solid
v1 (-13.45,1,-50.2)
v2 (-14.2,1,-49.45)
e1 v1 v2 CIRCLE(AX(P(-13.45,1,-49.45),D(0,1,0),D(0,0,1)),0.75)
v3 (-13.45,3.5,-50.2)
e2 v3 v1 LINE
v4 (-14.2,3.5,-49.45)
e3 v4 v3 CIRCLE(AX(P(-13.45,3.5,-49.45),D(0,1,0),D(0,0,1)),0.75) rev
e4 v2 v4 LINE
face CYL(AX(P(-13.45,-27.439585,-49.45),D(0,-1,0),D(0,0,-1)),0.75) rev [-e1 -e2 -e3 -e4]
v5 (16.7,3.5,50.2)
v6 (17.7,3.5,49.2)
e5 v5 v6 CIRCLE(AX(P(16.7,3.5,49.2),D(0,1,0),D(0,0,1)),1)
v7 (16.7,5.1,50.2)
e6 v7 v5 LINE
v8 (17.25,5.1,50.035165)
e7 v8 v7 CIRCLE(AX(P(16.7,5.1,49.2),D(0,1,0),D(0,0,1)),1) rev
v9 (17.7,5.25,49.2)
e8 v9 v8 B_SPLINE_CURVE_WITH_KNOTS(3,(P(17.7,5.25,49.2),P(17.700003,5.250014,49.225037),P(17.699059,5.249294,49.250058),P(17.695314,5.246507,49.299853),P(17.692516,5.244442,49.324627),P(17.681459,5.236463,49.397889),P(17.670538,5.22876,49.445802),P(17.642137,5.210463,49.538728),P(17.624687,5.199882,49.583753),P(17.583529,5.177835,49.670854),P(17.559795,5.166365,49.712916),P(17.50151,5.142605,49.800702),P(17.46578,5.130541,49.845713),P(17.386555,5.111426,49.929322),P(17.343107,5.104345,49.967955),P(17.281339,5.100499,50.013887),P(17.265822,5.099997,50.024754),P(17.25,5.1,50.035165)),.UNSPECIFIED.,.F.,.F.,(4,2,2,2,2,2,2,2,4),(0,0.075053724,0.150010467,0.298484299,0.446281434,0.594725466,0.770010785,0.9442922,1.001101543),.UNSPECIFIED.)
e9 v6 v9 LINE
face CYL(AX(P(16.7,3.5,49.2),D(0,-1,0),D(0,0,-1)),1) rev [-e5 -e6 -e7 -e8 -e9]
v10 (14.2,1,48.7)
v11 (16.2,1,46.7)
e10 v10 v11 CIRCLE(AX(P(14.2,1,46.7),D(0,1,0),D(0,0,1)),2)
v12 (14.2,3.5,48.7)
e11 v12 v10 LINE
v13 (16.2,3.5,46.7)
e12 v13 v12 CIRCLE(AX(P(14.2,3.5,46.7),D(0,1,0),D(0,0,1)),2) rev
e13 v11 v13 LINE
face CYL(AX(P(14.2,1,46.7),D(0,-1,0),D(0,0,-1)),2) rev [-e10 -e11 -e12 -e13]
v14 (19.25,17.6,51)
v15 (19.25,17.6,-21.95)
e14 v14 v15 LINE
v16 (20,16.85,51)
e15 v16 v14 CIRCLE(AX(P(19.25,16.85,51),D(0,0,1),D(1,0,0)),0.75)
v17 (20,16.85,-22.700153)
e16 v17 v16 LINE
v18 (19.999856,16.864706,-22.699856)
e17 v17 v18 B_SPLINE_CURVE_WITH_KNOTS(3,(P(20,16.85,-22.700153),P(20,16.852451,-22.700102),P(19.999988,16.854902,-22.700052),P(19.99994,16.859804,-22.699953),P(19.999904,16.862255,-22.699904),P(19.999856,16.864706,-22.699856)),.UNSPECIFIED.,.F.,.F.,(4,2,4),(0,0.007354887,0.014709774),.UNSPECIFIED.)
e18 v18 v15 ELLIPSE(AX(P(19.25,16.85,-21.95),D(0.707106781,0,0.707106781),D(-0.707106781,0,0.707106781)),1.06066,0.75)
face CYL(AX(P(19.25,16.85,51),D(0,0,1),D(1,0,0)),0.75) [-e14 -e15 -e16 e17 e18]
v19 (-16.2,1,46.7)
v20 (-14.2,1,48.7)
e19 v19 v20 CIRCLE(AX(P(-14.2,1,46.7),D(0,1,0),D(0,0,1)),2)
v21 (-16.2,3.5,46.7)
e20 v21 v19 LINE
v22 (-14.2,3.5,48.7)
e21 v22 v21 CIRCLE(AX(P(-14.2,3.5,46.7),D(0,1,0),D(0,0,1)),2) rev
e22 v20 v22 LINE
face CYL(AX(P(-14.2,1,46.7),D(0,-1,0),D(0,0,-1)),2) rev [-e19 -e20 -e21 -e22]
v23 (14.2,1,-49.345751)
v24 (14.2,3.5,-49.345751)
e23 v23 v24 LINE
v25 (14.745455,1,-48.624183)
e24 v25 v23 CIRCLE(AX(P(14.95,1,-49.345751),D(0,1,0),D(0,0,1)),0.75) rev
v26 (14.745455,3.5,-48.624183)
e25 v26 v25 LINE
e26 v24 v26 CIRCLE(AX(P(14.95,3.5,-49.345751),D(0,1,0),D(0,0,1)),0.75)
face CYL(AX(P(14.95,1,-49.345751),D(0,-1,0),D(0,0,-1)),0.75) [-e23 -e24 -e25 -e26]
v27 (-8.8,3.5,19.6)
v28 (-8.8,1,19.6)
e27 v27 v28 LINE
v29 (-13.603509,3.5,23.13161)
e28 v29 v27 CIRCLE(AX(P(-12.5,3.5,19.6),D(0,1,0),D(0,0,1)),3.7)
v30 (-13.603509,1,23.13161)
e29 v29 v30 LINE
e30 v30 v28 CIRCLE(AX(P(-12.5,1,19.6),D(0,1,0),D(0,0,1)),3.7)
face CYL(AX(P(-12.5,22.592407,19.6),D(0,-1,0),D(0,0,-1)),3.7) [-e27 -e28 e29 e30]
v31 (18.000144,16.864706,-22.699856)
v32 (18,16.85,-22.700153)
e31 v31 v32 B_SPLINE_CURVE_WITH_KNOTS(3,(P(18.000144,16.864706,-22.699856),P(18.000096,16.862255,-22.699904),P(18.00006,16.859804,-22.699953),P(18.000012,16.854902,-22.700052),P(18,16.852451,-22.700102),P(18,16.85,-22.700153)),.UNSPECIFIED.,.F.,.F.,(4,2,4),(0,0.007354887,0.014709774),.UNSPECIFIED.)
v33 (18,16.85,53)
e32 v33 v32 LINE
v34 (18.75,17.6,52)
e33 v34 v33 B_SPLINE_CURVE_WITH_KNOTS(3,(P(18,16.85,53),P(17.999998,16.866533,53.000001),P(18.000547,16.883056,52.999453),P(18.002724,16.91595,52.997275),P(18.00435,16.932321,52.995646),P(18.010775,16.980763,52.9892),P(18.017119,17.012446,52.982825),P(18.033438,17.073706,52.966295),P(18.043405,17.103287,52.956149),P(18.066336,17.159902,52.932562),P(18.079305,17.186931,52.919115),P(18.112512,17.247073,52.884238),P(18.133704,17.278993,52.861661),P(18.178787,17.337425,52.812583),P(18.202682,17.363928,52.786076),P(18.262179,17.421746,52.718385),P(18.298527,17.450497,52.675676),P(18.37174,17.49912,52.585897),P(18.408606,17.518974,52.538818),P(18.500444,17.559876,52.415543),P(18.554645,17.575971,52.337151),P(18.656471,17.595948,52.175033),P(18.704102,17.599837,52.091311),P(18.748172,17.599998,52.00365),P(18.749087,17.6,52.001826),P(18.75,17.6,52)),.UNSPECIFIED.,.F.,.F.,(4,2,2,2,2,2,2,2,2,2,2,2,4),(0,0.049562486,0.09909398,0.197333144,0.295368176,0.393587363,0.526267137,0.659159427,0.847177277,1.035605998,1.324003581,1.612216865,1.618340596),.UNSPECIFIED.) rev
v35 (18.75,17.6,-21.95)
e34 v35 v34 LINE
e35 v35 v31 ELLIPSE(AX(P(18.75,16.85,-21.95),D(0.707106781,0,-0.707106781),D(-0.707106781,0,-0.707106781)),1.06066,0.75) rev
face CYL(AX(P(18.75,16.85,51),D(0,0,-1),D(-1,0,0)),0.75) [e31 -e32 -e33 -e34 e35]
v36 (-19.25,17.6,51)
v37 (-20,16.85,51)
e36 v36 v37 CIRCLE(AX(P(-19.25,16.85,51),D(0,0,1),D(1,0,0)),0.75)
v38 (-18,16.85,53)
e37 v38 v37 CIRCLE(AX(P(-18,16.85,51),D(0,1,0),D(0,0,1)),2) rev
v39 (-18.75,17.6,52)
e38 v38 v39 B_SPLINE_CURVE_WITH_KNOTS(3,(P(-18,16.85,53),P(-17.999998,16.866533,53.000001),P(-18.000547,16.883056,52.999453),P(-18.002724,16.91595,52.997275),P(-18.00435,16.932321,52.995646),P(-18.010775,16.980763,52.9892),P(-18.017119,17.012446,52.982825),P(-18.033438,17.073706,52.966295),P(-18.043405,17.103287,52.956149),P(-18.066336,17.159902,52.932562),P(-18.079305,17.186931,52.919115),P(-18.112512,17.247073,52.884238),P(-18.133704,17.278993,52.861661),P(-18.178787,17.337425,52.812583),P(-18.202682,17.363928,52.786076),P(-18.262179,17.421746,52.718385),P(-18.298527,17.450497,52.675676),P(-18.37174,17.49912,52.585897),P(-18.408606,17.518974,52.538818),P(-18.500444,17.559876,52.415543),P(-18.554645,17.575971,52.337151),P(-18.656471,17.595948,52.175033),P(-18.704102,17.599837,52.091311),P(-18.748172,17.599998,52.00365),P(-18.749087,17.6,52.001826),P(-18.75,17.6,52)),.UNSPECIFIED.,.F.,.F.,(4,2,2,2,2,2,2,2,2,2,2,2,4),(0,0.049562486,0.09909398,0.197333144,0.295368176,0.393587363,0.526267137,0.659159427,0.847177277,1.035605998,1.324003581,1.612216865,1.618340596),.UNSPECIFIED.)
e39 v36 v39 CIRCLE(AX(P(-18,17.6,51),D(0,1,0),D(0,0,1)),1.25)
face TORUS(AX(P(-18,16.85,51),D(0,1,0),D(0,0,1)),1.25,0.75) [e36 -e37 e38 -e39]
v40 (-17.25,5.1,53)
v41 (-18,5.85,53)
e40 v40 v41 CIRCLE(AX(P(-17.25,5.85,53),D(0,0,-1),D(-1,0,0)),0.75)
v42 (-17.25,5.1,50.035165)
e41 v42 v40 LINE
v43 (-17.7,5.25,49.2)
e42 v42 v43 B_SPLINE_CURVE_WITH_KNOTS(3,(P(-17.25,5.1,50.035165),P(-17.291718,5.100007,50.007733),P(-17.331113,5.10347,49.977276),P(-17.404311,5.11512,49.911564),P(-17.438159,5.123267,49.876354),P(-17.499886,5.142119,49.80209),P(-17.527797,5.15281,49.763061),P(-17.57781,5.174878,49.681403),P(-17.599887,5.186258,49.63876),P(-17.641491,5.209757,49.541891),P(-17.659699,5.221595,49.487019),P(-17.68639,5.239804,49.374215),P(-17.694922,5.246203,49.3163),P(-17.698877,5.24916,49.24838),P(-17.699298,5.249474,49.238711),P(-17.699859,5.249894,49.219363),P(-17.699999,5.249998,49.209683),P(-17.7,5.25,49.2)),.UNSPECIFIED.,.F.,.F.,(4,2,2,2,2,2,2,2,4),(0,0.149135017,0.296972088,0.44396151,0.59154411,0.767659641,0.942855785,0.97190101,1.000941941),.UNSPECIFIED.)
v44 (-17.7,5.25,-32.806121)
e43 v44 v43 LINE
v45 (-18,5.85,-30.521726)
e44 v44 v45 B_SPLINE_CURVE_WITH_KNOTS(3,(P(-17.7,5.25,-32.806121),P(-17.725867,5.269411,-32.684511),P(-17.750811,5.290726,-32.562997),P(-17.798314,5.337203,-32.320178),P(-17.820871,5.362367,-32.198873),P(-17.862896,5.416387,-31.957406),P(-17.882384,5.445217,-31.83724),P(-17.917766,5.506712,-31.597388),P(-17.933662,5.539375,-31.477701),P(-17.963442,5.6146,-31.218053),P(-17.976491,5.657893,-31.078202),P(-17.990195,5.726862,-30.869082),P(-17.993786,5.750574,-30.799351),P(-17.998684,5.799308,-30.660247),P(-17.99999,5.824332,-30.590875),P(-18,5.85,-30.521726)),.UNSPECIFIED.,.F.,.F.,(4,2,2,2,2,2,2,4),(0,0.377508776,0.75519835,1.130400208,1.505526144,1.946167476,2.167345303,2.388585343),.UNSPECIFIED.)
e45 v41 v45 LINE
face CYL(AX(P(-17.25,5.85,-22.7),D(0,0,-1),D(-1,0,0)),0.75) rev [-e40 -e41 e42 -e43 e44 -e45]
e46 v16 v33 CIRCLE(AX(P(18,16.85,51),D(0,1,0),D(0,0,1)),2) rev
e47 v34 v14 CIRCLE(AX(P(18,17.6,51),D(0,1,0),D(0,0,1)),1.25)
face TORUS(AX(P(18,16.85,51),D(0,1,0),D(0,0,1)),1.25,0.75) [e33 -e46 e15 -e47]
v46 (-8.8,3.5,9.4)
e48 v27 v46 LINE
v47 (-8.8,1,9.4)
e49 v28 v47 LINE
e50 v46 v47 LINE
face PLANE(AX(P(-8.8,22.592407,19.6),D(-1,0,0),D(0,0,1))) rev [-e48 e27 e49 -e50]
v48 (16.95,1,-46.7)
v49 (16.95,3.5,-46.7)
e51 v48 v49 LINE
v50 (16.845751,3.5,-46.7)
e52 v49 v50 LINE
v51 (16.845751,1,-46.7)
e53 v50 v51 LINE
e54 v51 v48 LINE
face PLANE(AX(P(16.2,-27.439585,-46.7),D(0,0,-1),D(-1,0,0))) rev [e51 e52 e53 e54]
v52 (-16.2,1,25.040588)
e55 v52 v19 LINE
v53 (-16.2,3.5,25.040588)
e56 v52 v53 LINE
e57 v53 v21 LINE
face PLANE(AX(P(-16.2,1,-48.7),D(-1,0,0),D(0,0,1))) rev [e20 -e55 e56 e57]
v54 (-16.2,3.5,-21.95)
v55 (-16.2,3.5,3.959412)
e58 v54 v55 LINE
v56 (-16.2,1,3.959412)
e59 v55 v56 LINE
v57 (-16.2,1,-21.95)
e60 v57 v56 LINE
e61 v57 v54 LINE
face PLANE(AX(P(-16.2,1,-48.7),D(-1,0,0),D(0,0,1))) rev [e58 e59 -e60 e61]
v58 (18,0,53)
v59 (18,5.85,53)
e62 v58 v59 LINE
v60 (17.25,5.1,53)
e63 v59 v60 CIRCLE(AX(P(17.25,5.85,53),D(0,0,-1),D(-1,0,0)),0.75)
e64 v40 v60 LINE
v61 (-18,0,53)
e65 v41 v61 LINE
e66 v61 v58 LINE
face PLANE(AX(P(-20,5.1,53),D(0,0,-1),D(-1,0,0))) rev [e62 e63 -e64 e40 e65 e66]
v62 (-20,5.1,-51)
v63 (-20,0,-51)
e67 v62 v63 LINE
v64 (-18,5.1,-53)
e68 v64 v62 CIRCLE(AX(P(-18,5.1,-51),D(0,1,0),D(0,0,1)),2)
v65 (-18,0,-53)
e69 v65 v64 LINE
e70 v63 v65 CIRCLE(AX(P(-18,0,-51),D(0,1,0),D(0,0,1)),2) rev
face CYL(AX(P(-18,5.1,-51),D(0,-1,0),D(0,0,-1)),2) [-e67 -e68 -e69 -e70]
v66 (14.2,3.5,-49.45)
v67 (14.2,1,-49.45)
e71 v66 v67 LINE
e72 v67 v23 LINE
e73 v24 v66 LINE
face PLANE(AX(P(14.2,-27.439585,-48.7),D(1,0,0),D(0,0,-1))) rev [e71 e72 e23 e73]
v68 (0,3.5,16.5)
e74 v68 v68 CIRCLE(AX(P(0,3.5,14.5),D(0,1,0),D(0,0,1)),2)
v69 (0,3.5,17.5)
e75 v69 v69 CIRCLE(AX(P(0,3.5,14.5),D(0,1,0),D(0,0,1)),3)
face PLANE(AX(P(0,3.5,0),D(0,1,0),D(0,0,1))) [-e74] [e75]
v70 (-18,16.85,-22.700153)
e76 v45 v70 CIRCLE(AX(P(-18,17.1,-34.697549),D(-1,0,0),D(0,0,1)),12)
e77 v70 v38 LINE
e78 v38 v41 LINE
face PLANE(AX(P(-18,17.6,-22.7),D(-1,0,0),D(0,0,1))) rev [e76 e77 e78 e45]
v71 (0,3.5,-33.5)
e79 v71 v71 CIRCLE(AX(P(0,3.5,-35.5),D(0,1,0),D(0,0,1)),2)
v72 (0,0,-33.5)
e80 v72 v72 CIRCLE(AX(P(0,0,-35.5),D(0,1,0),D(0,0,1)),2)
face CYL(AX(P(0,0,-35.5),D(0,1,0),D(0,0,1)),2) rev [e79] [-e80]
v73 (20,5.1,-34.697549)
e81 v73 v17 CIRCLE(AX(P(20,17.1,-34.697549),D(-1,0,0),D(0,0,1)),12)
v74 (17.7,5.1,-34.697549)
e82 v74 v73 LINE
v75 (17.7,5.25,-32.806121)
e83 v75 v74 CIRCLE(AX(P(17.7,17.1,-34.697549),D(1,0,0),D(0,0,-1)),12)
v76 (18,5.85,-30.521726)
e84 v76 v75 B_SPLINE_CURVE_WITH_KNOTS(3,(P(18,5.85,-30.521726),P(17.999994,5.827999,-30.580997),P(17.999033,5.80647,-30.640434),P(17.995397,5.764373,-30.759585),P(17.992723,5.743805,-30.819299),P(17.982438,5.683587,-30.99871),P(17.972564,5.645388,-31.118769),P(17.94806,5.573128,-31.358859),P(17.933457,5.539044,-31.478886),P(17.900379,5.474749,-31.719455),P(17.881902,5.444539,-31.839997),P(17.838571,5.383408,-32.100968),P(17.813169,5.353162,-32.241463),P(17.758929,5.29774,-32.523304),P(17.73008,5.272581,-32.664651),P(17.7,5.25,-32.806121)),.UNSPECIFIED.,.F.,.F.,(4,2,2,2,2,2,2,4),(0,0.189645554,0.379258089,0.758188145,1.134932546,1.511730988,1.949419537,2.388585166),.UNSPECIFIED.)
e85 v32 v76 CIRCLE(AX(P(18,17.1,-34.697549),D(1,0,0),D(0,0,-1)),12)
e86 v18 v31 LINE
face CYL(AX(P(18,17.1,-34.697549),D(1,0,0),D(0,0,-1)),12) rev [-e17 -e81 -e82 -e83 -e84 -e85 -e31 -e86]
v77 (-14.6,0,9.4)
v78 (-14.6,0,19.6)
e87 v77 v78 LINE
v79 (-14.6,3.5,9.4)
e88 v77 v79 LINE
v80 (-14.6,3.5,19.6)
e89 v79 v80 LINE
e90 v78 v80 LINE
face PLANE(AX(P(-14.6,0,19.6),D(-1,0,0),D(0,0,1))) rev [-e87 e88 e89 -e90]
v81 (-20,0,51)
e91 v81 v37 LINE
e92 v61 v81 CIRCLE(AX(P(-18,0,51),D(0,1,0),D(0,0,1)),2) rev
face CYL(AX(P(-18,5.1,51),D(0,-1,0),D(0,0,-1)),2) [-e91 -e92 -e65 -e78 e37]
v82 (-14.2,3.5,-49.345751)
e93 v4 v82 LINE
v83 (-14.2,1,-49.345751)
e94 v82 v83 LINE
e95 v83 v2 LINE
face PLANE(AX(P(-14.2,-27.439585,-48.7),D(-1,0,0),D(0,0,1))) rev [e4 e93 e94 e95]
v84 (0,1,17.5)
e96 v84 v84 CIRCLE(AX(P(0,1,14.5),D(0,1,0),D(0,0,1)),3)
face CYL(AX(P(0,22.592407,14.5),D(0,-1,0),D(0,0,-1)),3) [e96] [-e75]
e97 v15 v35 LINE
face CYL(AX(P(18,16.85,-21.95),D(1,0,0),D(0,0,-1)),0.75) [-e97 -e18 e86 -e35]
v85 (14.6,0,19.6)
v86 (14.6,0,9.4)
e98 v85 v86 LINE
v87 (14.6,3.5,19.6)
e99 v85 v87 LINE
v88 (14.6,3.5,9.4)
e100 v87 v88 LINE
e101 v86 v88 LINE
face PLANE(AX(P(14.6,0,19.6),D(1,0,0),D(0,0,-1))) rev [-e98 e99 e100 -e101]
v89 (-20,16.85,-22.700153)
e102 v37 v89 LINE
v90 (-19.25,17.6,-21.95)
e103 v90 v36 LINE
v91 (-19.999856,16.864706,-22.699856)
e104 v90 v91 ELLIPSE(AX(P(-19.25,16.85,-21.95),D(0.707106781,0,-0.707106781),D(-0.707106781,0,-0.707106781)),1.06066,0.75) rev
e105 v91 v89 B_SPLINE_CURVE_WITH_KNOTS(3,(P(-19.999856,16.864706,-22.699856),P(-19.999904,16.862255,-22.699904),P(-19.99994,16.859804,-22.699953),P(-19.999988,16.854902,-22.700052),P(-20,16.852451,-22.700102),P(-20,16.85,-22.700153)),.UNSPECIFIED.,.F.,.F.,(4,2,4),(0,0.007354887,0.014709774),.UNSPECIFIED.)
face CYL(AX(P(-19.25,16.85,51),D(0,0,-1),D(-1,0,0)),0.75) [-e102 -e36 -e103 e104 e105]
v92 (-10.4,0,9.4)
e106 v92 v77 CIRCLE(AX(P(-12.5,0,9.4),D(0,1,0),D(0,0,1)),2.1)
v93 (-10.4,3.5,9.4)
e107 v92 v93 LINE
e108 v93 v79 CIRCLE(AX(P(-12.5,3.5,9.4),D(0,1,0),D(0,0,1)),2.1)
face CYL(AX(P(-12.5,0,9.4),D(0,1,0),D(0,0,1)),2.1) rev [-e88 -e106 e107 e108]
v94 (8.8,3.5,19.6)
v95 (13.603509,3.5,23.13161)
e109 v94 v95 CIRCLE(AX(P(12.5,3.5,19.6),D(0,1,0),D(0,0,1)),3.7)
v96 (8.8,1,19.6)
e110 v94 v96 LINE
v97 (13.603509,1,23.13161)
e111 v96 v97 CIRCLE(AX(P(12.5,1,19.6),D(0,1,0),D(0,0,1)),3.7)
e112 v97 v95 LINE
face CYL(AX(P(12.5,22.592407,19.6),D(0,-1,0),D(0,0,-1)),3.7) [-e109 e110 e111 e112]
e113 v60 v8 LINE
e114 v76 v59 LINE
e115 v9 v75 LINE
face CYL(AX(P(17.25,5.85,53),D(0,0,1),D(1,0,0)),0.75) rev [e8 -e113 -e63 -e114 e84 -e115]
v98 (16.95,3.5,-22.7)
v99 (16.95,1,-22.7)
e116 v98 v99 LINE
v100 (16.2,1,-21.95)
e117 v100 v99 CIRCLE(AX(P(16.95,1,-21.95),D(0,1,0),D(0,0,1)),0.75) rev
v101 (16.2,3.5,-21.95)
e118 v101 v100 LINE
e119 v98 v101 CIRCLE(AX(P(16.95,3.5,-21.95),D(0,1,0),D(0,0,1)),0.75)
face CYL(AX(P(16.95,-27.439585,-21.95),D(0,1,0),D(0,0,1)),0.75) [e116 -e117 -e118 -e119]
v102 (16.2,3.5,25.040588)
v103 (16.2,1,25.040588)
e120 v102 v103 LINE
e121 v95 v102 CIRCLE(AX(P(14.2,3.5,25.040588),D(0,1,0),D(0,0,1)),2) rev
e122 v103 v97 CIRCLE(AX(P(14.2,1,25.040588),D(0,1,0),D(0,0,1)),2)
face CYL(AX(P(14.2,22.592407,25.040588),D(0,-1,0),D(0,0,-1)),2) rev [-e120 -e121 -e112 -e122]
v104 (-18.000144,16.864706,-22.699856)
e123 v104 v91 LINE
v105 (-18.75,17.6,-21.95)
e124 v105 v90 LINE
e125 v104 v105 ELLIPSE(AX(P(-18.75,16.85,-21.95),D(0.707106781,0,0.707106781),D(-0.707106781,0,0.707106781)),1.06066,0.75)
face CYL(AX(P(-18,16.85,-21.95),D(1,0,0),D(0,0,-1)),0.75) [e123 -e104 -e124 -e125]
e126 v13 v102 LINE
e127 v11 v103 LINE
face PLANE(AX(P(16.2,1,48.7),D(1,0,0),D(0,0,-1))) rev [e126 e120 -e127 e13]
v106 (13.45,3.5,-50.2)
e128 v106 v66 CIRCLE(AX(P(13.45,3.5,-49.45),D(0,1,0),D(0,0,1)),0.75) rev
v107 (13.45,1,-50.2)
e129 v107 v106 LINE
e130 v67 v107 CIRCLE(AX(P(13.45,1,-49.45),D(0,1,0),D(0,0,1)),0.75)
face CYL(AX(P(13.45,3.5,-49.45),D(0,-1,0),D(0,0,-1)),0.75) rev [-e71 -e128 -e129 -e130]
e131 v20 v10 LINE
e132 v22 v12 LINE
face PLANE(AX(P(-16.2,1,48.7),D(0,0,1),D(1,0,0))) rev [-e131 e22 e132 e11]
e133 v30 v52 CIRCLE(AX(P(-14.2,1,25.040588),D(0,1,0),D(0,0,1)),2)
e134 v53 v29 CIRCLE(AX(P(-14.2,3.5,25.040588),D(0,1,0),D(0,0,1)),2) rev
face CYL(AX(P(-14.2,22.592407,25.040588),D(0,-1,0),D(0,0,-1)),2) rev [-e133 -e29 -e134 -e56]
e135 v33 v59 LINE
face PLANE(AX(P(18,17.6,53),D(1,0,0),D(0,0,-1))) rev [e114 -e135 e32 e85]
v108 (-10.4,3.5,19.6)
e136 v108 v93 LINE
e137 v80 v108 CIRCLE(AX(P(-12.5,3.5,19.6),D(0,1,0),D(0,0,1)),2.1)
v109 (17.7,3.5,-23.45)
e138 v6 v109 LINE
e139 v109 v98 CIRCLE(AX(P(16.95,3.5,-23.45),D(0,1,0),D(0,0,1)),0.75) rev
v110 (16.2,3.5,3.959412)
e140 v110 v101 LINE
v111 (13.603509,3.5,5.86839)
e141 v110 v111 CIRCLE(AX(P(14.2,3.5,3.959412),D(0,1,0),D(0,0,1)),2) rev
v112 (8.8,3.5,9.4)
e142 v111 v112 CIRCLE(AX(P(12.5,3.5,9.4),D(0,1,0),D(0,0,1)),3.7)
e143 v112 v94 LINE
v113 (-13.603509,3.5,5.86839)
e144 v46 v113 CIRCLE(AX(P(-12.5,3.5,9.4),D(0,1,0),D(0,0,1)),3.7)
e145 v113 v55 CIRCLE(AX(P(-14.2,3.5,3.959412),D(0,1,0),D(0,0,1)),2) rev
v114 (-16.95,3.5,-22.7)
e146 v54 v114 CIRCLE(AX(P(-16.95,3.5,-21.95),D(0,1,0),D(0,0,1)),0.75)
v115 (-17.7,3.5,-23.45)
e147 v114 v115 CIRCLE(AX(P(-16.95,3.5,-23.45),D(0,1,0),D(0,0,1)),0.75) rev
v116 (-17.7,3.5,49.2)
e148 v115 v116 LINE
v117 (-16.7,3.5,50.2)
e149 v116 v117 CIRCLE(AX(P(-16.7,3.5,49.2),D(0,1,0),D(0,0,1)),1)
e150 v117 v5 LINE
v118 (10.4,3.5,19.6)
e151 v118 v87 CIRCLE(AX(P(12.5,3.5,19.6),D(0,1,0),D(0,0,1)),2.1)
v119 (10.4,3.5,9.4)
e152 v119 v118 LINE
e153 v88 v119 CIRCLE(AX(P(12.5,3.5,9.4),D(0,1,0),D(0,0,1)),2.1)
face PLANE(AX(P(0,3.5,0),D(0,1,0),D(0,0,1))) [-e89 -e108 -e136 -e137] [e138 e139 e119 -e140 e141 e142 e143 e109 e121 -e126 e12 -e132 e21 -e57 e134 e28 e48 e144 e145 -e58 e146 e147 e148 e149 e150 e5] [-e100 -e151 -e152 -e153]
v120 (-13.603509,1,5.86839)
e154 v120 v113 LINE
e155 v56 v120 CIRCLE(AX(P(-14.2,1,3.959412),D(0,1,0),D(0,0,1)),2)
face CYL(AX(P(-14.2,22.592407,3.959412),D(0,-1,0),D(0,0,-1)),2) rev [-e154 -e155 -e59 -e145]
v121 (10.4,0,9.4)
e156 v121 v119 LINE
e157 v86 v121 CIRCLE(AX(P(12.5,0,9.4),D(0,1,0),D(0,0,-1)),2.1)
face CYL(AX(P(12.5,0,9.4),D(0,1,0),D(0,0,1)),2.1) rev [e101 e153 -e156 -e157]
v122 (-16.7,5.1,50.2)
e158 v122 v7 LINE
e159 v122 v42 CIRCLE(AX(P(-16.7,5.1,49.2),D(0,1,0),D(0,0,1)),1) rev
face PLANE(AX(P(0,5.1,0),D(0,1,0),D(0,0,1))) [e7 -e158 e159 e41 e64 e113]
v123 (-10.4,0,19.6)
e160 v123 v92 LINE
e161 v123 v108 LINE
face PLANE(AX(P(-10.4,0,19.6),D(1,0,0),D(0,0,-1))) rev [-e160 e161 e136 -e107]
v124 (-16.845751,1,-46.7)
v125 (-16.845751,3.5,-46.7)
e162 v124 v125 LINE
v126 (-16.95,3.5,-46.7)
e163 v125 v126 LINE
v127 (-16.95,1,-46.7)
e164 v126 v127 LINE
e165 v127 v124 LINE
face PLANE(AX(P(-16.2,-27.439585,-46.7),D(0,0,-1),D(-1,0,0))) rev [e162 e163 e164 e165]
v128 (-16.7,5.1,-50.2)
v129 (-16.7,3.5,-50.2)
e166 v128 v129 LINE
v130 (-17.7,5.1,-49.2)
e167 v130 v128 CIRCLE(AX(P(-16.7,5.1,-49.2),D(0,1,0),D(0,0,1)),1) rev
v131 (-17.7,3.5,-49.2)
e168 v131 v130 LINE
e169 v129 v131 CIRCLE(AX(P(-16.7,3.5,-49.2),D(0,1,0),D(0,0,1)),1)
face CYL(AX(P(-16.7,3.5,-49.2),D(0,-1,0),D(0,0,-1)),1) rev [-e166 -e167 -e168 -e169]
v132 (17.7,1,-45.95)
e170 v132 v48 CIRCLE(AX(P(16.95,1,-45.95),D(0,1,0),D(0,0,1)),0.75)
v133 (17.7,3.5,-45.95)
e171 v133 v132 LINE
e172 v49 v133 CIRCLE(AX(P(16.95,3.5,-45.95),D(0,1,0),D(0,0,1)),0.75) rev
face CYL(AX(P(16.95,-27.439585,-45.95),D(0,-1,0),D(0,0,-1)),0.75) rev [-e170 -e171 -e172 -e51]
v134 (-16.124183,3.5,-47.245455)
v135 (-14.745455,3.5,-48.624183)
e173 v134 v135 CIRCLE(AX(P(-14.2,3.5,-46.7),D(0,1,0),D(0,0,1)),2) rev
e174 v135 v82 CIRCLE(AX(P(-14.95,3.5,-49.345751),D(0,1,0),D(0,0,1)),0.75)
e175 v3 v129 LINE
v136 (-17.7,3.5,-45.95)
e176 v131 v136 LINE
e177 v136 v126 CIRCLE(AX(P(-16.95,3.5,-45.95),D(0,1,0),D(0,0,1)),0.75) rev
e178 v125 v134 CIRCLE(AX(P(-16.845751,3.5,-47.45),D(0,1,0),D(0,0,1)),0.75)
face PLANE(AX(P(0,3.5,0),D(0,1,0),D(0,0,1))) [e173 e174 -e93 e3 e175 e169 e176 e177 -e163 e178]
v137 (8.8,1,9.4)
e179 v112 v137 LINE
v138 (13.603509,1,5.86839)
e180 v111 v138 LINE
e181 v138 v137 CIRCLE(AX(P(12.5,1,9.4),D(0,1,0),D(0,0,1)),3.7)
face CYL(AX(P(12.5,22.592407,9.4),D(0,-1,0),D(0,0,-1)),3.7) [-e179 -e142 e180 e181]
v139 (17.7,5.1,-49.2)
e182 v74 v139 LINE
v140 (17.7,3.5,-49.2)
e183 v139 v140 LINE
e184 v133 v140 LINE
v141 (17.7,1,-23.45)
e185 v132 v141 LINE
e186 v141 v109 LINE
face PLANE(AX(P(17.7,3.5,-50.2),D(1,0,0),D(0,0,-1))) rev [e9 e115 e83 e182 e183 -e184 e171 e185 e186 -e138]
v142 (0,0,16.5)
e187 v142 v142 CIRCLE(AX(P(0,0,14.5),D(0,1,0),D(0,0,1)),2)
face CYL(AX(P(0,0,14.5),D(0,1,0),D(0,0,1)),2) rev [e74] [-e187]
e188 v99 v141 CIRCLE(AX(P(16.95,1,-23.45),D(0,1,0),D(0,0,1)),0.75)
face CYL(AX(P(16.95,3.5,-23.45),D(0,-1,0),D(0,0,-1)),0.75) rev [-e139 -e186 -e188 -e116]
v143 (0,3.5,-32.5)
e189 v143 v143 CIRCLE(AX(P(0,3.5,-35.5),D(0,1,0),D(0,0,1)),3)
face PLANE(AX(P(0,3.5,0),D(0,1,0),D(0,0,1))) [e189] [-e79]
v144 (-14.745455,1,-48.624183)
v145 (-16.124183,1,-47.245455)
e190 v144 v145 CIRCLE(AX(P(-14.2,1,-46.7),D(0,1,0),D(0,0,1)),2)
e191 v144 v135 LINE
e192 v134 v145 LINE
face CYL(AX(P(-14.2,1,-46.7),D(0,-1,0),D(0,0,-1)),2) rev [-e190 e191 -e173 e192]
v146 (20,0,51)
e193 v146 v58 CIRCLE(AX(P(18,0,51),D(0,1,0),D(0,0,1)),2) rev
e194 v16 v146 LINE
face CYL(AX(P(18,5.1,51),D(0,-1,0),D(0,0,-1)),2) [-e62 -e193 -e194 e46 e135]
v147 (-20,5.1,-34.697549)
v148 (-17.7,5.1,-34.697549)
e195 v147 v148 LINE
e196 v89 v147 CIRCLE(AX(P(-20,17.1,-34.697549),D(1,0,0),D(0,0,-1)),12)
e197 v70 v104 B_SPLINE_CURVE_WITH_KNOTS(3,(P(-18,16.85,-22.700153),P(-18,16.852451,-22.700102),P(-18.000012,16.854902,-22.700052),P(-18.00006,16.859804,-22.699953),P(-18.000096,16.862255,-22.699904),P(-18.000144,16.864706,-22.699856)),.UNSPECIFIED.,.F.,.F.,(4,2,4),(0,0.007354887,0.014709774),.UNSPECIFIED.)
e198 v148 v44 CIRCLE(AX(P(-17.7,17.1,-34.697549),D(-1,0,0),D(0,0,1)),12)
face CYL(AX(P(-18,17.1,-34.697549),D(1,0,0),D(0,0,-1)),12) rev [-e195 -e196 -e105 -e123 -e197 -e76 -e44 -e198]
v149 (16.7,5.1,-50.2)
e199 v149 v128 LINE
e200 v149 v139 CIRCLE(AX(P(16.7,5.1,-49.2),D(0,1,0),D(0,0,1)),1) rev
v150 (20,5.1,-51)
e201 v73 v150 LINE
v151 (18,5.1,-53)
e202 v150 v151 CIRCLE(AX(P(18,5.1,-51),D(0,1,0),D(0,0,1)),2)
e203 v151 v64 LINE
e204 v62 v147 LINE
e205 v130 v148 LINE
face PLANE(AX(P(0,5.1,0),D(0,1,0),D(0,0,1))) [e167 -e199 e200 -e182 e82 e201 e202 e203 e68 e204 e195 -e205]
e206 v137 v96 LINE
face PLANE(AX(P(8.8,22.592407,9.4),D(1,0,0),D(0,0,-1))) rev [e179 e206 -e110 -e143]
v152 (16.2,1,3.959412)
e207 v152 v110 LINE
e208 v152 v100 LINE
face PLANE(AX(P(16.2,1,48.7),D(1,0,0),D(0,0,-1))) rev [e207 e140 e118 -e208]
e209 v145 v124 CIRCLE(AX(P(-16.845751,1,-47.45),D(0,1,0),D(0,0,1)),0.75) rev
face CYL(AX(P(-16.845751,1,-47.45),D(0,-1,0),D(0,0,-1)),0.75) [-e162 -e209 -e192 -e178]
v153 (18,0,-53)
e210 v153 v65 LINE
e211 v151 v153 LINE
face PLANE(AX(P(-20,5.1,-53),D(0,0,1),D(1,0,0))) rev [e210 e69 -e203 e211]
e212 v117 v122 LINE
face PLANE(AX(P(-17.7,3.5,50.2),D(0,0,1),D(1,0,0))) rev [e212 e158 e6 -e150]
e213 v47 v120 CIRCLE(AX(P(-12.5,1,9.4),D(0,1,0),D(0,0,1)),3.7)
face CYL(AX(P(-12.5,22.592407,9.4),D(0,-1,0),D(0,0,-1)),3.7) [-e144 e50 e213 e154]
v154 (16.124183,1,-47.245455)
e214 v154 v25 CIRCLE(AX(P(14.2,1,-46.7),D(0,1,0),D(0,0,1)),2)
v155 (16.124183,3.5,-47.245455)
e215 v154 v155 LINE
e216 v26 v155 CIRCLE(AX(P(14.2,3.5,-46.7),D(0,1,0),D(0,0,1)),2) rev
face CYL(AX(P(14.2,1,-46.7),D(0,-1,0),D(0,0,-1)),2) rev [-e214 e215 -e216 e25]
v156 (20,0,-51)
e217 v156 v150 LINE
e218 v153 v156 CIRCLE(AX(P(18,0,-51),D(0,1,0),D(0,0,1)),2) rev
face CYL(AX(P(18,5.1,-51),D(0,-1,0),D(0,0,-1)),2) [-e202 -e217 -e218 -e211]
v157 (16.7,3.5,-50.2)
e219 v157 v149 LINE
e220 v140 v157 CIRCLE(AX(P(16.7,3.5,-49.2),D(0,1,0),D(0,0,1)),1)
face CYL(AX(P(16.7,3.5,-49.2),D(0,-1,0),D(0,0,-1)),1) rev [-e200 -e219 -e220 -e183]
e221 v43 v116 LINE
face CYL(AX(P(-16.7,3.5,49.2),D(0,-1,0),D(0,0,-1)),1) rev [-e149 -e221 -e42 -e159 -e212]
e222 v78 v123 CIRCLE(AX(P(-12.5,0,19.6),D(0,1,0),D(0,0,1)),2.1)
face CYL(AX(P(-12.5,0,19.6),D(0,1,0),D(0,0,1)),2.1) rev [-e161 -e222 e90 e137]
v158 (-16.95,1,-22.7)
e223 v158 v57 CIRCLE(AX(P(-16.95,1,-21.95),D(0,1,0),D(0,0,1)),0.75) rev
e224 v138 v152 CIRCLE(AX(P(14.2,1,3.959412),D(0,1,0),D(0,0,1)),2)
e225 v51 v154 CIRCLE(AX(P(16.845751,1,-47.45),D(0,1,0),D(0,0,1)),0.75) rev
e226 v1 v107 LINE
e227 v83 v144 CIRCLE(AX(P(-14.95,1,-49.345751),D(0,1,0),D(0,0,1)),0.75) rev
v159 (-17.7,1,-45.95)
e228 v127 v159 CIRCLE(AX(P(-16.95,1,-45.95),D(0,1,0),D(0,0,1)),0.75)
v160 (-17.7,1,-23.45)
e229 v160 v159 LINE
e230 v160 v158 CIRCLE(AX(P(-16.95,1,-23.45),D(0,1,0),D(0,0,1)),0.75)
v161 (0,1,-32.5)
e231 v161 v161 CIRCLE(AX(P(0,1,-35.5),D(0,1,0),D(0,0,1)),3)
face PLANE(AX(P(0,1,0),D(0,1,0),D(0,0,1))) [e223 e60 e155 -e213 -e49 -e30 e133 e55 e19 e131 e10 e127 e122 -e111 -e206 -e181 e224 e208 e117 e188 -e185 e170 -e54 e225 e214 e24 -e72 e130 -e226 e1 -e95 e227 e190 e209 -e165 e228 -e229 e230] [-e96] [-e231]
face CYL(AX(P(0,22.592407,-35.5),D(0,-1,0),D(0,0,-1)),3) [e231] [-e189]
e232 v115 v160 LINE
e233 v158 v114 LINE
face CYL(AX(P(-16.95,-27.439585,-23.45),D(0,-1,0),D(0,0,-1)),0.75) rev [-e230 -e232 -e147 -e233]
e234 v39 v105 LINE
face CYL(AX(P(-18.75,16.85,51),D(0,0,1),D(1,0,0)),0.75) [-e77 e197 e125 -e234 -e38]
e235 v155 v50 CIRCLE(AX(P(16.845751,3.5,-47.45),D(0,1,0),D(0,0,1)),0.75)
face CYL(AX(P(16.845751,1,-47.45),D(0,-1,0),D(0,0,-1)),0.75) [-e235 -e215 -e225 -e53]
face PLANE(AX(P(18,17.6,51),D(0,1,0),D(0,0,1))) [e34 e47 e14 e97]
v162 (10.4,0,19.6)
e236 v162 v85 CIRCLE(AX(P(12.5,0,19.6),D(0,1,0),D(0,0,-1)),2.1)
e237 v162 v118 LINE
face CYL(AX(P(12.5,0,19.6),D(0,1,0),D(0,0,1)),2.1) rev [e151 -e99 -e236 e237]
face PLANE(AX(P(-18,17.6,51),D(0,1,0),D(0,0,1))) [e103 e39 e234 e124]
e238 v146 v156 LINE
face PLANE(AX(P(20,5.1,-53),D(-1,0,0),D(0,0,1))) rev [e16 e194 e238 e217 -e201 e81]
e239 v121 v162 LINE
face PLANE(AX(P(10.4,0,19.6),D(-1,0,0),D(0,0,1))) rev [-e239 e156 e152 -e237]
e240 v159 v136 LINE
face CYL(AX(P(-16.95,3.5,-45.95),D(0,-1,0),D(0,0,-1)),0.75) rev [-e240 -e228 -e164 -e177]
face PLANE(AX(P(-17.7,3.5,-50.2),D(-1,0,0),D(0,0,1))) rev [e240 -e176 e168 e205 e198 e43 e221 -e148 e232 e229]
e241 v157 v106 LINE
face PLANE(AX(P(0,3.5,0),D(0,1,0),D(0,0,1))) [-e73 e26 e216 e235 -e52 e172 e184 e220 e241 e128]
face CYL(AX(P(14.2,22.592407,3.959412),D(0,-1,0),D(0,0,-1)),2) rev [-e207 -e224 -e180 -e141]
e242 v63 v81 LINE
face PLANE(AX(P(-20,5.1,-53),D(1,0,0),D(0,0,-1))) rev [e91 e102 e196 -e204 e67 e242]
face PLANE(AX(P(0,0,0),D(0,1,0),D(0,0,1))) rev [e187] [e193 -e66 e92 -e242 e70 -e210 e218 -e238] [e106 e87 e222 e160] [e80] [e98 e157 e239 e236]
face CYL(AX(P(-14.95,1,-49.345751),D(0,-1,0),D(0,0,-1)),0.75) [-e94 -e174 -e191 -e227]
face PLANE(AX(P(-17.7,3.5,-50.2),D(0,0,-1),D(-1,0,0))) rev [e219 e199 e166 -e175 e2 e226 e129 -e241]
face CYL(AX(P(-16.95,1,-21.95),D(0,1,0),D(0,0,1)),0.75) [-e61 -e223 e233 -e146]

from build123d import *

# Parameters (mm, degrees)
EXTRUDE_1_DEPTH     = 5.1
CUT_EXTRUDE_1_DEPTH = 1.6
CUT_EXTRUDE_2_DEPTH = 2.5
FILLET_1_R          = 2
SKETCH_4_W          = 28.4
SKETCH_4_H          = 1.5
CUT_EXTRUDE_3_DEPTH = 2.5
SKETCH_6_R          = 2.0000000000000013
SKETCH_6_R_2        = 2.0000000000000004
CUT_EXTRUDE_4_DEPTH = 57.796214662598786
EXTRUDE_START       = 2.5
SKETCH_7_R          = 3.000000000000001
SKETCH_7_R_2        = 2.000000000000002
SKETCH_7_R_3        = 3.0000000000000004
SKETCH_7_R_4        = 2
EXTRUDE_2_DEPTH     = 2.5
FILLET_2_R          = 2
FILLET_3_R          = 0.75
EXTRUDE_START_2     = 12.5
EXTRUDE_3_DEPTH     = 12.5
FILLET_4_R          = 0.75
FILLET_START        = -20
FILLET_5_DEPTH      = 2
FILLET_START_2      = 18
FILLET_5_2_DEPTH    = 2
FILLET_START_3      = -34.697548884
FILLET_5_3_DEPTH    = 11.997548884
FILLET_START_4      = -18
FILLET_5_4_DEPTH    = 36
FILLET_6_R          = 1


with BuildPart() as part:
    # 草图1 → 凸台-拉伸1 (new body)
    with BuildSketch(Plane(origin=(0, 0, 0), x_dir=(1, 0, 0), z_dir=(0, 1, 0))):
        Polygon((-20.000000000000004, 53.00000000000001), (19.999999999999996, 53.00000000000001), (20.00000000000001, -52.99999999999999), (-19.99999999999999, -52.99999999999999), align=None)
    extrude(amount=EXTRUDE_1_DEPTH)

    # 草图2 → 切除-拉伸1 (cut)
    with BuildSketch(Plane(origin=(0, 5.1, 0), x_dir=(1, 0, 0), z_dir=(0, 1, 0))):
        Polygon((-17.700000000000006, 50.20000000000001), (17.699999999999992, 50.20000000000001), (17.700000000000006, -50.199999999999996), (-17.699999999999992, -50.199999999999996), align=None)
    extrude(amount=-CUT_EXTRUDE_1_DEPTH, mode=Mode.SUBTRACT)

    # 草图3 → 切除-拉伸2 (cut)
    with BuildSketch(Plane(origin=(0, 3.4999999999999996, 0), x_dir=(1, 0, 0), z_dir=(0, 1, 0))):
        Polygon((16.200000000000006, -48.699999999999996), (16.199999999999992, 48.70000000000001), (-16.200000000000006, 48.70000000000001), (-16.199999999999992, -48.699999999999996), align=None)
    extrude(amount=-CUT_EXTRUDE_2_DEPTH, mode=Mode.SUBTRACT)

    # 圆角1
    fillet_1_edges = [part.edges().sort_by_distance(p)[0] for p in [
        (16.200000000000006, 2.2499999999999996, 48.699999999999996),
        (-16.199999999999992, 2.2499999999999996, 48.699999999999996),
        (-16.200000000000006, 2.2499999999999996, -48.70000000000001),
        (16.199999999999992, 2.2499999999999996, -48.70000000000001),
        (20.00000000000001, 2.55, 52.99999999999999),
        (-19.99999999999999, 2.55, 52.99999999999999),
        (-20.000000000000004, 2.55, -53.00000000000001),
        (19.999999999999996, 2.55, -53.00000000000001),
    ]]
    fillet(fillet_1_edges, radius=FILLET_1_R)

    # 草图4 → 切除-拉伸3 (cut)
    with BuildSketch(Plane(origin=(0, 3.4999999999999996, 0), x_dir=(1, 0, 0), z_dir=(0, 1, 0))):
        with Locations((-4.44e-15, 49.45000000000002)):
            Rectangle(SKETCH_4_W, SKETCH_4_H)
        Polygon((-16.200000000000006, 46.7), (-17.700000000000006, 46.7), (-17.70000000000001, 22.700000000000006), (-16.200000000000003, 22.700000000000006), align=None)
        Polygon((16.199999999999992, 46.7), (17.700000000000006, 46.7), (17.700000000000006, 22.7), (16.2, 22.700000000000006), align=None)
    extrude(amount=-CUT_EXTRUDE_3_DEPTH, mode=Mode.SUBTRACT)

    # 草图6 → 切除-拉伸4 (cut, through all)
    with BuildSketch(Plane(origin=(0, 0.9999999999999996, 0), x_dir=(1, 0, 0), z_dir=(0, 1, 0))):
        with Locations(Location((2.14e-15, 35.5, 0), (0, 0, 270))):
            Circle(SKETCH_6_R)
        with Locations(Location((8.51e-15, -14.5, 0), (0, 0, 270))):
            Circle(SKETCH_6_R_2)
        with BuildLine():
            Line((-14.59999999999999, -19.599999999999998), (-14.59999999999999, -9.400000000000002))
            ThreePointArc((-14.59999999999999, -9.400000000000002), (-12.499999999999993, -7.300000000000006), (-10.399999999999997, -9.4))
            Line((-10.399999999999997, -9.4), (-10.399999999999995, -19.6))
            ThreePointArc((-10.399999999999995, -19.6), (-12.499999999999995, -21.699999999999996), (-14.59999999999999, -19.599999999999998))
        make_face()
        with BuildLine():
            Line((14.600000000000007, -19.599999999999998), (14.600000000000005, -9.399999999999999))
            ThreePointArc((14.600000000000005, -9.399999999999999), (12.500000000000009, -7.3000000000000025), (10.40000000000001, -9.4))
            Line((10.40000000000001, -9.4), (10.400000000000011, -19.599999999999998))
            ThreePointArc((10.400000000000011, -19.599999999999998), (12.500000000000009, -21.699999999999996), (14.600000000000007, -19.599999999999998))
        make_face()
    extrude(amount=-CUT_EXTRUDE_4_DEPTH, mode=Mode.SUBTRACT)

    # 草图7 → 凸台-拉伸2 (add)
    # profile 1 of 4: a face of its own
    with BuildSketch(Plane(origin=(0, 0.9999999999999996, 0), x_dir=(1, 0, 0), z_dir=(0, 1, 0)).offset(EXTRUDE_START)):
        with Locations(Location((2.14e-15, 35.5, 0), (0, 0, 270))):
            Circle(SKETCH_7_R)
        with Locations(Location((2.14e-15, 35.5, 0), (0, 0, 270))):
            Circle(SKETCH_7_R_2, mode=Mode.SUBTRACT)
    # profile 2 of 4: a face of its own
    with BuildSketch(Plane(origin=(0, 0.9999999999999996, 0), x_dir=(1, 0, 0), z_dir=(0, 1, 0)).offset(EXTRUDE_START)):
        with Locations(Location((8.51e-15, -14.5, 0), (0, 0, 270))):
            Circle(SKETCH_7_R_3)
        with Locations(Location((8.51e-15, -14.5, 0), (0, 0, 270))):
            Circle(SKETCH_7_R_4, mode=Mode.SUBTRACT)
    # profile 3 of 4: a face of its own
    with BuildSketch(Plane(origin=(0, 0.9999999999999996, 0), x_dir=(1, 0, 0), z_dir=(0, 1, 0)).offset(EXTRUDE_START)):
        with BuildLine():
            Line((-8.799999999999992, -19.600000000000005), (-8.799999999999994, -9.4))
            ThreePointArc((-8.799999999999994, -9.4), (-12.499999999999993, -5.700000000000003), (-16.199999999999992, -9.400000000000002))
            Line((-16.199999999999992, -9.400000000000002), (-16.199999999999992, -19.599999999999998))
            ThreePointArc((-16.199999999999992, -19.599999999999998), (-12.499999999999996, -23.299999999999997), (-8.799999999999992, -19.600000000000005))
        make_face()
        with BuildLine():
            Line((-14.59999999999999, -9.400000000000002), (-14.59999999999999, -19.599999999999998))
            ThreePointArc((-14.59999999999999, -19.599999999999998), (-12.499999999999995, -21.699999999999996), (-10.399999999999995, -19.6))
            Line((-10.399999999999995, -19.6), (-10.399999999999995, -9.4))
            ThreePointArc((-10.399999999999995, -9.4), (-12.499999999999993, -7.300000000000004), (-14.59999999999999, -9.400000000000002))
        make_face(mode=Mode.SUBTRACT)
    # profile 4 of 4: a face of its own
    with BuildSketch(Plane(origin=(0, 0.9999999999999996, 0), x_dir=(1, 0, 0), z_dir=(0, 1, 0)).offset(EXTRUDE_START)):
        with BuildLine():
            Line((16.200000000000006, -19.599999999999998), (16.200000000000006, -9.399999999999999))
            ThreePointArc((16.200000000000006, -9.399999999999999), (12.500000000000009, -5.700000000000005), (8.800000000000015, -9.399999999999999))
            Line((8.800000000000015, -9.399999999999999), (8.800000000000013, -19.599999999999998))
            ThreePointArc((8.800000000000013, -19.599999999999998), (12.500000000000009, -23.299999999999994), (16.200000000000006, -19.599999999999998))
        make_face()
        with BuildLine():
            Line((14.600000000000007, -19.599999999999998), (14.600000000000005, -9.399999999999999))
            ThreePointArc((14.600000000000005, -9.399999999999999), (12.500000000000009, -7.300000000000006), (10.400000000000011, -9.4))
            Line((10.400000000000011, -9.4), (10.400000000000011, -19.599999999999998))
            ThreePointArc((10.400000000000011, -19.599999999999998), (12.500000000000009, -21.699999999999996), (14.600000000000007, -19.599999999999998))
        make_face(mode=Mode.SUBTRACT)
    extrude(amount=-EXTRUDE_2_DEPTH)

    # 圆角2
    fillet_2_edges = [part.edges().sort_by_distance(p)[0] for p in [
        (-16.199999999999992, 2.2499999999999996, 9.400000000000002),
        (-16.199999999999992, 2.2499999999999996, 19.599999999999998),
        (16.200000000000006, 2.2499999999999996, 9.399999999999999),
        (16.20000000000001, 2.2499999999999996, 19.599999999999998),
    ]]
    fillet(fillet_2_edges, radius=FILLET_2_R)

    # 圆角3
    fillet_3_edges = [part.edges().sort_by_distance(p)[0] for p in [
        (16.2, 2.2499999999999996, -22.700000000000006),
        (17.700000000000006, 2.2499999999999996, -22.7),
        (-16.200000000000003, 2.2499999999999996, -22.700000000000006),
        (-17.70000000000001, 2.2499999999999996, -22.700000000000006),
        (17.700000000000006, 2.2499999999999996, -46.7),
        (14.199999999999992, 2.2499999999999996, -50.20000000000001),
        (-14.200000000000005, 2.2499999999999996, -50.20000000000001),
        (-17.700000000000006, 2.2499999999999996, -46.7),
        (-16.200000000000006, 2.2499999999999996, -46.70000000000001),
        (-14.200000000000006, 2.2499999999999996, -48.70000000000001),
        (14.199999999999992, 2.2499999999999996, -48.70000000000001),
        (16.199999999999992, 2.2499999999999996, -46.70000000000001),
    ]]
    fillet(fillet_3_edges, radius=FILLET_3_R - 0.0001)  # a hair under: the kernel refuses the full size

    # 草图9 → 凸台-拉伸3 (add)
    with BuildSketch(Plane(origin=(0, 5.1, 0), x_dir=(1, 0, 0), z_dir=(0, 1, 0)).offset(EXTRUDE_START_2)):
        with BuildLine():
            Line((-20, 22.69999999999999), (-18.000000000000007, 22.69999999999999))
            Line((-18.000000000000007, 22.69999999999999), (-17.99999999999999, -52.99999999999999))
            ThreePointArc((-17.99999999999999, -52.99999999999999), (-19.414213562373085, -52.414213562373085), (-19.99999999999999, -50.99999999999999))
            Line((-19.99999999999999, -50.99999999999999), (-20, 22.69999999999999))
        make_face()
        with BuildLine():
            Line((20.00000000000001, -50.99999999999999), (20, 22.69999999999999))
            Line((20, 22.69999999999999), (18.00000000000001, 22.69999999999999))
            Line((18.00000000000001, 22.69999999999999), (18.00000000000001, -52.99999999999999))
            ThreePointArc((18.00000000000001, -52.99999999999999), (19.414213562373106, -52.414213562373085), (20.00000000000001, -50.99999999999999))
        make_face()
    extrude(amount=-EXTRUDE_3_DEPTH)

    # 圆角4
    # the kernel refuses this fillet: 0.75 mm, written as the material it adds along each edge
    with BuildSketch(Plane(origin=(-18.000000000000007, 5.1, -22.69999999999999), x_dir=(1, 0, -2.3e-16), z_dir=(2.3e-16, 0, 1))) as fillet_4_piece_1_section:
        with BuildLine():
            CenterArc((FILLET_4_R, FILLET_4_R), FILLET_4_R, 180, 90)
            Line((0, FILLET_4_R), (0, 0))
            Line((0, 0), (FILLET_4_R, 0))
        make_face()
    fillet_4_piece_1 = extrude(amount=75.69999999999999, mode=Mode.PRIVATE)
    fillet_4_piece_1 = split(fillet_4_piece_1, bisect_by=Plane(origin=(-17.7, 5.1, -22.69999999999999), z_dir=(-1, 0, 1.4e-16)), keep=Keep.TOP, mode=Mode.PRIVATE)
    add(fillet_4_piece_1)
    with BuildSketch(Plane(origin=(-18.000000000000007, 5.1, -24.57499999999999), x_dir=(1, 0, -2.3e-16), z_dir=(2.3e-16, 0, 1))) as fillet_4_piece_2_section:
        with BuildLine():
            CenterArc((FILLET_4_R, FILLET_4_R), FILLET_4_R, 180, 90)
            Line((0, FILLET_4_R), (0, 0))
            Line((0, 0), (FILLET_4_R, 0))
        make_face()
    fillet_4_piece_2 = extrude(amount=77.57499999999999, mode=Mode.PRIVATE)
    fillet_4_piece_2 = split(fillet_4_piece_2, bisect_by=Plane(origin=(-18.000000000000007, 5.1, 50.19999999999999), z_dir=(0, 0, 1)), keep=Keep.TOP, mode=Mode.PRIVATE)
    add(fillet_4_piece_2)
    with BuildSketch(Plane(origin=(18.00000000000001, 5.1, -22.69999999999999), x_dir=(-1, 0, 0), z_dir=(0, 0, 1))) as fillet_4_piece_3_section:
        with BuildLine():
            CenterArc((FILLET_4_R, -FILLET_4_R), FILLET_4_R, 90, 90)
            Line((0, -FILLET_4_R), (0, 0))
            Line((0, 0), (FILLET_4_R, 0))
        make_face()
    fillet_4_piece_3 = extrude(amount=75.69999999999999, mode=Mode.PRIVATE)
    fillet_4_piece_3 = split(fillet_4_piece_3, bisect_by=Plane(origin=(17.7, 5.1, -22.69999999999999), z_dir=(1, 0, -1.4e-16)), keep=Keep.TOP, mode=Mode.PRIVATE)
    add(fillet_4_piece_3)
    with BuildSketch(Plane(origin=(18.00000000000001, 5.1, -24.57499999999999), x_dir=(-1, 0, 0), z_dir=(0, 0, 1))) as fillet_4_piece_4_section:
        with BuildLine():
            CenterArc((FILLET_4_R, -FILLET_4_R), FILLET_4_R, 90, 90)
            Line((0, -FILLET_4_R), (0, 0))
            Line((0, 0), (FILLET_4_R, 0))
        make_face()
    fillet_4_piece_4 = extrude(amount=77.57499999999999, mode=Mode.PRIVATE)
    fillet_4_piece_4 = split(fillet_4_piece_4, bisect_by=Plane(origin=(18.00000000000001, 5.1, 50.19999999999999), z_dir=(0, 0, 1)), keep=Keep.TOP, mode=Mode.PRIVATE)
    add(fillet_4_piece_4)
    # the kernel refuses this fillet: 0.75 mm, written as the material it takes off along each edge
    with BuildSketch(Plane(origin=(-19.99999999999999, 17.6, 50.99999999999999), x_dir=(1, 0, -1.4e-16), z_dir=(-1.4e-16, 0, -1))) as fillet_4_2_piece_1:
        with BuildLine():
            CenterArc((FILLET_4_R, FILLET_4_R), FILLET_4_R, 180, 90)
            Line((0, FILLET_4_R), (0, 0))
            Line((0, 0), (FILLET_4_R, 0))
        make_face()
    extrude(amount=75.57499999999999, mode=Mode.SUBTRACT)
    with BuildSketch(Plane(origin=(-17.99999999999999, 17.6, 50.99999999999999), x_dir=(0.8063039257097581, 0, 0.5915014618621268), z_dir=(0.5915014618621268, 0, -0.8063039257097581))) as fillet_4_2_piece_2:
        with BuildLine():
            CenterArc((2 - FILLET_4_R, FILLET_4_R), FILLET_4_R, 270, 90)
            Line((2, FILLET_4_R), (2, 0))
            Line((2, 0), (2 - FILLET_4_R, 0))
        make_face()
    revolve(axis=Axis((-17.99999999999999, 17.6, 50.99999999999999), (0, -1, 0)), revolution_arc=143.736370964023, mode=Mode.SUBTRACT)
    with BuildSketch(Plane(origin=(-18.000000000000007, 17.6, -24.57499999999999), x_dir=(-1, 0, 2.3e-16), z_dir=(2.3e-16, 0, 1)), Plane(origin=(18.00000000000001, 17.6, -24.57499999999999), x_dir=(0, -1, 0), z_dir=(0, 0, 1))) as fillet_4_2_piece_3:
        with BuildLine():
            CenterArc((FILLET_4_R, FILLET_4_R), FILLET_4_R, 180, 90)
            Line((0, FILLET_4_R), (0, 0))
            Line((0, 0), (FILLET_4_R, 0))
        make_face()
    extrude(amount=79.44999999999999, mode=Mode.SUBTRACT)
    with BuildSketch(Plane(origin=(-21.875, 17.6, -22.69999999999999), x_dir=(0, -1, 0), z_dir=(1, 0, 0))) as fillet_4_2_piece_4:
        with BuildLine():
            CenterArc((FILLET_4_R, -FILLET_4_R), FILLET_4_R, 90, 90)
            Line((0, -FILLET_4_R), (0, 0))
            Line((0, 0), (FILLET_4_R, 0))
        make_face()
    extrude(amount=5.749999999999993, mode=Mode.SUBTRACT)
    with BuildSketch(Plane(origin=(21.875, 17.6, -22.69999999999999), x_dir=(0, 0, 1), z_dir=(-1, 0, 0))) as fillet_4_2_piece_5:
        with BuildLine():
            CenterArc((FILLET_4_R, -FILLET_4_R), FILLET_4_R, 90, 90)
            Line((0, -FILLET_4_R), (0, 0))
            Line((0, 0), (FILLET_4_R, 0))
        make_face()
    extrude(amount=5.749999999999989, mode=Mode.SUBTRACT)
    with BuildSketch(Plane(origin=(18.00000000000001, 17.6, 50.99999999999999), x_dir=(-0.8063039257097581, 0, 0.5915014618621268), z_dir=(-0.5915014618621268, 0, -0.8063039257097581))) as fillet_4_2_piece_6:
        with BuildLine():
            CenterArc((2 - FILLET_4_R, -FILLET_4_R), FILLET_4_R, 0, 90)
            Line((2, -FILLET_4_R), (2, 0))
            Line((2, 0), (2 - FILLET_4_R, 0))
        make_face()
    revolve(axis=Axis((18.00000000000001, 17.6, 50.99999999999999), (0, 1, 0)), revolution_arc=143.736370964023, mode=Mode.SUBTRACT)
    with BuildSketch(Plane(origin=(20.00000000000001, 17.6, 50.99999999999999), x_dir=(-1, 0, 1.4e-16), z_dir=(-1.4e-16, 0, -1))) as fillet_4_2_piece_7:
        with BuildLine():
            CenterArc((FILLET_4_R, -FILLET_4_R), FILLET_4_R, 90, 90)
            Line((0, -FILLET_4_R), (0, 0))
            Line((0, 0), (FILLET_4_R, 0))
        make_face()
    extrude(amount=75.57499999999999, mode=Mode.SUBTRACT)

    # 圆角5: read off the stored shape, not the designer's step
    # 圆角5 outline → 圆角5 (add)
    with BuildSketch(Plane.YZ.offset(FILLET_START)):
        with BuildLine():
            ThreePointArc((5.1, -34.697548784), (8.531933432, -26.29586828), (16.864705882, -22.699855811))
            ThreePointArc((16.864705882, -22.699855811), (16.857353294, -22.699963952), (16.85, -22.7))
            Line((16.85, -22.7), (5.1, -22.7))
            Line((5.1, -22.7), (5.1, -34.697548784))
        make_face()
    extrude(amount=FILLET_5_DEPTH)

    # Fillet 5 2 outline → Fillet 5 2 (add)
    with BuildSketch(Plane.YZ.offset(FILLET_START_2)):
        with BuildLine():
            ThreePointArc((5.1, -34.697548784), (8.531933432, -26.29586828), (16.864705882, -22.699855811))
            ThreePointArc((16.864705882, -22.699855811), (16.857353294, -22.699963952), (16.85, -22.7))
            Line((16.85, -22.7), (5.1, -22.7))
            Line((5.1, -22.7), (5.1, -34.697548784))
        make_face()
    extrude(amount=FILLET_5_2_DEPTH)

    # Fillet 5 3 outline → Fillet 5 3 (add)
    with BuildSketch(Plane.XY.offset(FILLET_START_3)):
        with BuildLine():
            ThreePointArc((18, 5.85), (17.920820393, 5.514589803), (17.7, 5.25))
            Line((17.7, 5.25), (17.7, 5.1))
            Line((17.7, 5.1), (18, 5.1))
            Line((18, 5.1), (18, 5.85))
        make_face()
        with BuildLine():
            Line((-17.7, 5.1), (-17.7, 5.25))
            ThreePointArc((-17.7, 5.25), (-17.920820393, 5.514589803), (-18, 5.85))
            Line((-18, 5.85), (-18, 5.1))
            Line((-18, 5.1), (-17.7, 5.1))
        make_face()
    extrude(amount=FILLET_5_3_DEPTH)

    # Fillet 5 4 outline → Fillet 5 4 (cut)
    with BuildSketch(Plane.YZ.offset(FILLET_START_4)):
        with BuildLine():
            ThreePointArc((5.85, -30.521725511), (5.288988189, -32.57622844), (5.1, -34.697548784))
            Line((5.1, -34.697548784), (5.85, -34.697548884))
            Line((5.85, -34.697548884), (5.85, -30.521725511))
        make_face()
    extrude(amount=FILLET_5_4_DEPTH, mode=Mode.SUBTRACT)

    # 圆角6
    fillet_6_edges = [part.edges().sort_by_distance(p)[0] for p in [
        (17.700000000000003, 4.374999999999999, 50.2),
        (-17.699999999999996, 4.374999999999999, 50.2),
        (-17.700000000000006, 4.3, -50.20000000000001),
        (17.699999999999992, 4.3, -50.20000000000001),
    ]]
    fillet(fillet_6_edges, radius=FILLET_6_R)


solid = part.part
